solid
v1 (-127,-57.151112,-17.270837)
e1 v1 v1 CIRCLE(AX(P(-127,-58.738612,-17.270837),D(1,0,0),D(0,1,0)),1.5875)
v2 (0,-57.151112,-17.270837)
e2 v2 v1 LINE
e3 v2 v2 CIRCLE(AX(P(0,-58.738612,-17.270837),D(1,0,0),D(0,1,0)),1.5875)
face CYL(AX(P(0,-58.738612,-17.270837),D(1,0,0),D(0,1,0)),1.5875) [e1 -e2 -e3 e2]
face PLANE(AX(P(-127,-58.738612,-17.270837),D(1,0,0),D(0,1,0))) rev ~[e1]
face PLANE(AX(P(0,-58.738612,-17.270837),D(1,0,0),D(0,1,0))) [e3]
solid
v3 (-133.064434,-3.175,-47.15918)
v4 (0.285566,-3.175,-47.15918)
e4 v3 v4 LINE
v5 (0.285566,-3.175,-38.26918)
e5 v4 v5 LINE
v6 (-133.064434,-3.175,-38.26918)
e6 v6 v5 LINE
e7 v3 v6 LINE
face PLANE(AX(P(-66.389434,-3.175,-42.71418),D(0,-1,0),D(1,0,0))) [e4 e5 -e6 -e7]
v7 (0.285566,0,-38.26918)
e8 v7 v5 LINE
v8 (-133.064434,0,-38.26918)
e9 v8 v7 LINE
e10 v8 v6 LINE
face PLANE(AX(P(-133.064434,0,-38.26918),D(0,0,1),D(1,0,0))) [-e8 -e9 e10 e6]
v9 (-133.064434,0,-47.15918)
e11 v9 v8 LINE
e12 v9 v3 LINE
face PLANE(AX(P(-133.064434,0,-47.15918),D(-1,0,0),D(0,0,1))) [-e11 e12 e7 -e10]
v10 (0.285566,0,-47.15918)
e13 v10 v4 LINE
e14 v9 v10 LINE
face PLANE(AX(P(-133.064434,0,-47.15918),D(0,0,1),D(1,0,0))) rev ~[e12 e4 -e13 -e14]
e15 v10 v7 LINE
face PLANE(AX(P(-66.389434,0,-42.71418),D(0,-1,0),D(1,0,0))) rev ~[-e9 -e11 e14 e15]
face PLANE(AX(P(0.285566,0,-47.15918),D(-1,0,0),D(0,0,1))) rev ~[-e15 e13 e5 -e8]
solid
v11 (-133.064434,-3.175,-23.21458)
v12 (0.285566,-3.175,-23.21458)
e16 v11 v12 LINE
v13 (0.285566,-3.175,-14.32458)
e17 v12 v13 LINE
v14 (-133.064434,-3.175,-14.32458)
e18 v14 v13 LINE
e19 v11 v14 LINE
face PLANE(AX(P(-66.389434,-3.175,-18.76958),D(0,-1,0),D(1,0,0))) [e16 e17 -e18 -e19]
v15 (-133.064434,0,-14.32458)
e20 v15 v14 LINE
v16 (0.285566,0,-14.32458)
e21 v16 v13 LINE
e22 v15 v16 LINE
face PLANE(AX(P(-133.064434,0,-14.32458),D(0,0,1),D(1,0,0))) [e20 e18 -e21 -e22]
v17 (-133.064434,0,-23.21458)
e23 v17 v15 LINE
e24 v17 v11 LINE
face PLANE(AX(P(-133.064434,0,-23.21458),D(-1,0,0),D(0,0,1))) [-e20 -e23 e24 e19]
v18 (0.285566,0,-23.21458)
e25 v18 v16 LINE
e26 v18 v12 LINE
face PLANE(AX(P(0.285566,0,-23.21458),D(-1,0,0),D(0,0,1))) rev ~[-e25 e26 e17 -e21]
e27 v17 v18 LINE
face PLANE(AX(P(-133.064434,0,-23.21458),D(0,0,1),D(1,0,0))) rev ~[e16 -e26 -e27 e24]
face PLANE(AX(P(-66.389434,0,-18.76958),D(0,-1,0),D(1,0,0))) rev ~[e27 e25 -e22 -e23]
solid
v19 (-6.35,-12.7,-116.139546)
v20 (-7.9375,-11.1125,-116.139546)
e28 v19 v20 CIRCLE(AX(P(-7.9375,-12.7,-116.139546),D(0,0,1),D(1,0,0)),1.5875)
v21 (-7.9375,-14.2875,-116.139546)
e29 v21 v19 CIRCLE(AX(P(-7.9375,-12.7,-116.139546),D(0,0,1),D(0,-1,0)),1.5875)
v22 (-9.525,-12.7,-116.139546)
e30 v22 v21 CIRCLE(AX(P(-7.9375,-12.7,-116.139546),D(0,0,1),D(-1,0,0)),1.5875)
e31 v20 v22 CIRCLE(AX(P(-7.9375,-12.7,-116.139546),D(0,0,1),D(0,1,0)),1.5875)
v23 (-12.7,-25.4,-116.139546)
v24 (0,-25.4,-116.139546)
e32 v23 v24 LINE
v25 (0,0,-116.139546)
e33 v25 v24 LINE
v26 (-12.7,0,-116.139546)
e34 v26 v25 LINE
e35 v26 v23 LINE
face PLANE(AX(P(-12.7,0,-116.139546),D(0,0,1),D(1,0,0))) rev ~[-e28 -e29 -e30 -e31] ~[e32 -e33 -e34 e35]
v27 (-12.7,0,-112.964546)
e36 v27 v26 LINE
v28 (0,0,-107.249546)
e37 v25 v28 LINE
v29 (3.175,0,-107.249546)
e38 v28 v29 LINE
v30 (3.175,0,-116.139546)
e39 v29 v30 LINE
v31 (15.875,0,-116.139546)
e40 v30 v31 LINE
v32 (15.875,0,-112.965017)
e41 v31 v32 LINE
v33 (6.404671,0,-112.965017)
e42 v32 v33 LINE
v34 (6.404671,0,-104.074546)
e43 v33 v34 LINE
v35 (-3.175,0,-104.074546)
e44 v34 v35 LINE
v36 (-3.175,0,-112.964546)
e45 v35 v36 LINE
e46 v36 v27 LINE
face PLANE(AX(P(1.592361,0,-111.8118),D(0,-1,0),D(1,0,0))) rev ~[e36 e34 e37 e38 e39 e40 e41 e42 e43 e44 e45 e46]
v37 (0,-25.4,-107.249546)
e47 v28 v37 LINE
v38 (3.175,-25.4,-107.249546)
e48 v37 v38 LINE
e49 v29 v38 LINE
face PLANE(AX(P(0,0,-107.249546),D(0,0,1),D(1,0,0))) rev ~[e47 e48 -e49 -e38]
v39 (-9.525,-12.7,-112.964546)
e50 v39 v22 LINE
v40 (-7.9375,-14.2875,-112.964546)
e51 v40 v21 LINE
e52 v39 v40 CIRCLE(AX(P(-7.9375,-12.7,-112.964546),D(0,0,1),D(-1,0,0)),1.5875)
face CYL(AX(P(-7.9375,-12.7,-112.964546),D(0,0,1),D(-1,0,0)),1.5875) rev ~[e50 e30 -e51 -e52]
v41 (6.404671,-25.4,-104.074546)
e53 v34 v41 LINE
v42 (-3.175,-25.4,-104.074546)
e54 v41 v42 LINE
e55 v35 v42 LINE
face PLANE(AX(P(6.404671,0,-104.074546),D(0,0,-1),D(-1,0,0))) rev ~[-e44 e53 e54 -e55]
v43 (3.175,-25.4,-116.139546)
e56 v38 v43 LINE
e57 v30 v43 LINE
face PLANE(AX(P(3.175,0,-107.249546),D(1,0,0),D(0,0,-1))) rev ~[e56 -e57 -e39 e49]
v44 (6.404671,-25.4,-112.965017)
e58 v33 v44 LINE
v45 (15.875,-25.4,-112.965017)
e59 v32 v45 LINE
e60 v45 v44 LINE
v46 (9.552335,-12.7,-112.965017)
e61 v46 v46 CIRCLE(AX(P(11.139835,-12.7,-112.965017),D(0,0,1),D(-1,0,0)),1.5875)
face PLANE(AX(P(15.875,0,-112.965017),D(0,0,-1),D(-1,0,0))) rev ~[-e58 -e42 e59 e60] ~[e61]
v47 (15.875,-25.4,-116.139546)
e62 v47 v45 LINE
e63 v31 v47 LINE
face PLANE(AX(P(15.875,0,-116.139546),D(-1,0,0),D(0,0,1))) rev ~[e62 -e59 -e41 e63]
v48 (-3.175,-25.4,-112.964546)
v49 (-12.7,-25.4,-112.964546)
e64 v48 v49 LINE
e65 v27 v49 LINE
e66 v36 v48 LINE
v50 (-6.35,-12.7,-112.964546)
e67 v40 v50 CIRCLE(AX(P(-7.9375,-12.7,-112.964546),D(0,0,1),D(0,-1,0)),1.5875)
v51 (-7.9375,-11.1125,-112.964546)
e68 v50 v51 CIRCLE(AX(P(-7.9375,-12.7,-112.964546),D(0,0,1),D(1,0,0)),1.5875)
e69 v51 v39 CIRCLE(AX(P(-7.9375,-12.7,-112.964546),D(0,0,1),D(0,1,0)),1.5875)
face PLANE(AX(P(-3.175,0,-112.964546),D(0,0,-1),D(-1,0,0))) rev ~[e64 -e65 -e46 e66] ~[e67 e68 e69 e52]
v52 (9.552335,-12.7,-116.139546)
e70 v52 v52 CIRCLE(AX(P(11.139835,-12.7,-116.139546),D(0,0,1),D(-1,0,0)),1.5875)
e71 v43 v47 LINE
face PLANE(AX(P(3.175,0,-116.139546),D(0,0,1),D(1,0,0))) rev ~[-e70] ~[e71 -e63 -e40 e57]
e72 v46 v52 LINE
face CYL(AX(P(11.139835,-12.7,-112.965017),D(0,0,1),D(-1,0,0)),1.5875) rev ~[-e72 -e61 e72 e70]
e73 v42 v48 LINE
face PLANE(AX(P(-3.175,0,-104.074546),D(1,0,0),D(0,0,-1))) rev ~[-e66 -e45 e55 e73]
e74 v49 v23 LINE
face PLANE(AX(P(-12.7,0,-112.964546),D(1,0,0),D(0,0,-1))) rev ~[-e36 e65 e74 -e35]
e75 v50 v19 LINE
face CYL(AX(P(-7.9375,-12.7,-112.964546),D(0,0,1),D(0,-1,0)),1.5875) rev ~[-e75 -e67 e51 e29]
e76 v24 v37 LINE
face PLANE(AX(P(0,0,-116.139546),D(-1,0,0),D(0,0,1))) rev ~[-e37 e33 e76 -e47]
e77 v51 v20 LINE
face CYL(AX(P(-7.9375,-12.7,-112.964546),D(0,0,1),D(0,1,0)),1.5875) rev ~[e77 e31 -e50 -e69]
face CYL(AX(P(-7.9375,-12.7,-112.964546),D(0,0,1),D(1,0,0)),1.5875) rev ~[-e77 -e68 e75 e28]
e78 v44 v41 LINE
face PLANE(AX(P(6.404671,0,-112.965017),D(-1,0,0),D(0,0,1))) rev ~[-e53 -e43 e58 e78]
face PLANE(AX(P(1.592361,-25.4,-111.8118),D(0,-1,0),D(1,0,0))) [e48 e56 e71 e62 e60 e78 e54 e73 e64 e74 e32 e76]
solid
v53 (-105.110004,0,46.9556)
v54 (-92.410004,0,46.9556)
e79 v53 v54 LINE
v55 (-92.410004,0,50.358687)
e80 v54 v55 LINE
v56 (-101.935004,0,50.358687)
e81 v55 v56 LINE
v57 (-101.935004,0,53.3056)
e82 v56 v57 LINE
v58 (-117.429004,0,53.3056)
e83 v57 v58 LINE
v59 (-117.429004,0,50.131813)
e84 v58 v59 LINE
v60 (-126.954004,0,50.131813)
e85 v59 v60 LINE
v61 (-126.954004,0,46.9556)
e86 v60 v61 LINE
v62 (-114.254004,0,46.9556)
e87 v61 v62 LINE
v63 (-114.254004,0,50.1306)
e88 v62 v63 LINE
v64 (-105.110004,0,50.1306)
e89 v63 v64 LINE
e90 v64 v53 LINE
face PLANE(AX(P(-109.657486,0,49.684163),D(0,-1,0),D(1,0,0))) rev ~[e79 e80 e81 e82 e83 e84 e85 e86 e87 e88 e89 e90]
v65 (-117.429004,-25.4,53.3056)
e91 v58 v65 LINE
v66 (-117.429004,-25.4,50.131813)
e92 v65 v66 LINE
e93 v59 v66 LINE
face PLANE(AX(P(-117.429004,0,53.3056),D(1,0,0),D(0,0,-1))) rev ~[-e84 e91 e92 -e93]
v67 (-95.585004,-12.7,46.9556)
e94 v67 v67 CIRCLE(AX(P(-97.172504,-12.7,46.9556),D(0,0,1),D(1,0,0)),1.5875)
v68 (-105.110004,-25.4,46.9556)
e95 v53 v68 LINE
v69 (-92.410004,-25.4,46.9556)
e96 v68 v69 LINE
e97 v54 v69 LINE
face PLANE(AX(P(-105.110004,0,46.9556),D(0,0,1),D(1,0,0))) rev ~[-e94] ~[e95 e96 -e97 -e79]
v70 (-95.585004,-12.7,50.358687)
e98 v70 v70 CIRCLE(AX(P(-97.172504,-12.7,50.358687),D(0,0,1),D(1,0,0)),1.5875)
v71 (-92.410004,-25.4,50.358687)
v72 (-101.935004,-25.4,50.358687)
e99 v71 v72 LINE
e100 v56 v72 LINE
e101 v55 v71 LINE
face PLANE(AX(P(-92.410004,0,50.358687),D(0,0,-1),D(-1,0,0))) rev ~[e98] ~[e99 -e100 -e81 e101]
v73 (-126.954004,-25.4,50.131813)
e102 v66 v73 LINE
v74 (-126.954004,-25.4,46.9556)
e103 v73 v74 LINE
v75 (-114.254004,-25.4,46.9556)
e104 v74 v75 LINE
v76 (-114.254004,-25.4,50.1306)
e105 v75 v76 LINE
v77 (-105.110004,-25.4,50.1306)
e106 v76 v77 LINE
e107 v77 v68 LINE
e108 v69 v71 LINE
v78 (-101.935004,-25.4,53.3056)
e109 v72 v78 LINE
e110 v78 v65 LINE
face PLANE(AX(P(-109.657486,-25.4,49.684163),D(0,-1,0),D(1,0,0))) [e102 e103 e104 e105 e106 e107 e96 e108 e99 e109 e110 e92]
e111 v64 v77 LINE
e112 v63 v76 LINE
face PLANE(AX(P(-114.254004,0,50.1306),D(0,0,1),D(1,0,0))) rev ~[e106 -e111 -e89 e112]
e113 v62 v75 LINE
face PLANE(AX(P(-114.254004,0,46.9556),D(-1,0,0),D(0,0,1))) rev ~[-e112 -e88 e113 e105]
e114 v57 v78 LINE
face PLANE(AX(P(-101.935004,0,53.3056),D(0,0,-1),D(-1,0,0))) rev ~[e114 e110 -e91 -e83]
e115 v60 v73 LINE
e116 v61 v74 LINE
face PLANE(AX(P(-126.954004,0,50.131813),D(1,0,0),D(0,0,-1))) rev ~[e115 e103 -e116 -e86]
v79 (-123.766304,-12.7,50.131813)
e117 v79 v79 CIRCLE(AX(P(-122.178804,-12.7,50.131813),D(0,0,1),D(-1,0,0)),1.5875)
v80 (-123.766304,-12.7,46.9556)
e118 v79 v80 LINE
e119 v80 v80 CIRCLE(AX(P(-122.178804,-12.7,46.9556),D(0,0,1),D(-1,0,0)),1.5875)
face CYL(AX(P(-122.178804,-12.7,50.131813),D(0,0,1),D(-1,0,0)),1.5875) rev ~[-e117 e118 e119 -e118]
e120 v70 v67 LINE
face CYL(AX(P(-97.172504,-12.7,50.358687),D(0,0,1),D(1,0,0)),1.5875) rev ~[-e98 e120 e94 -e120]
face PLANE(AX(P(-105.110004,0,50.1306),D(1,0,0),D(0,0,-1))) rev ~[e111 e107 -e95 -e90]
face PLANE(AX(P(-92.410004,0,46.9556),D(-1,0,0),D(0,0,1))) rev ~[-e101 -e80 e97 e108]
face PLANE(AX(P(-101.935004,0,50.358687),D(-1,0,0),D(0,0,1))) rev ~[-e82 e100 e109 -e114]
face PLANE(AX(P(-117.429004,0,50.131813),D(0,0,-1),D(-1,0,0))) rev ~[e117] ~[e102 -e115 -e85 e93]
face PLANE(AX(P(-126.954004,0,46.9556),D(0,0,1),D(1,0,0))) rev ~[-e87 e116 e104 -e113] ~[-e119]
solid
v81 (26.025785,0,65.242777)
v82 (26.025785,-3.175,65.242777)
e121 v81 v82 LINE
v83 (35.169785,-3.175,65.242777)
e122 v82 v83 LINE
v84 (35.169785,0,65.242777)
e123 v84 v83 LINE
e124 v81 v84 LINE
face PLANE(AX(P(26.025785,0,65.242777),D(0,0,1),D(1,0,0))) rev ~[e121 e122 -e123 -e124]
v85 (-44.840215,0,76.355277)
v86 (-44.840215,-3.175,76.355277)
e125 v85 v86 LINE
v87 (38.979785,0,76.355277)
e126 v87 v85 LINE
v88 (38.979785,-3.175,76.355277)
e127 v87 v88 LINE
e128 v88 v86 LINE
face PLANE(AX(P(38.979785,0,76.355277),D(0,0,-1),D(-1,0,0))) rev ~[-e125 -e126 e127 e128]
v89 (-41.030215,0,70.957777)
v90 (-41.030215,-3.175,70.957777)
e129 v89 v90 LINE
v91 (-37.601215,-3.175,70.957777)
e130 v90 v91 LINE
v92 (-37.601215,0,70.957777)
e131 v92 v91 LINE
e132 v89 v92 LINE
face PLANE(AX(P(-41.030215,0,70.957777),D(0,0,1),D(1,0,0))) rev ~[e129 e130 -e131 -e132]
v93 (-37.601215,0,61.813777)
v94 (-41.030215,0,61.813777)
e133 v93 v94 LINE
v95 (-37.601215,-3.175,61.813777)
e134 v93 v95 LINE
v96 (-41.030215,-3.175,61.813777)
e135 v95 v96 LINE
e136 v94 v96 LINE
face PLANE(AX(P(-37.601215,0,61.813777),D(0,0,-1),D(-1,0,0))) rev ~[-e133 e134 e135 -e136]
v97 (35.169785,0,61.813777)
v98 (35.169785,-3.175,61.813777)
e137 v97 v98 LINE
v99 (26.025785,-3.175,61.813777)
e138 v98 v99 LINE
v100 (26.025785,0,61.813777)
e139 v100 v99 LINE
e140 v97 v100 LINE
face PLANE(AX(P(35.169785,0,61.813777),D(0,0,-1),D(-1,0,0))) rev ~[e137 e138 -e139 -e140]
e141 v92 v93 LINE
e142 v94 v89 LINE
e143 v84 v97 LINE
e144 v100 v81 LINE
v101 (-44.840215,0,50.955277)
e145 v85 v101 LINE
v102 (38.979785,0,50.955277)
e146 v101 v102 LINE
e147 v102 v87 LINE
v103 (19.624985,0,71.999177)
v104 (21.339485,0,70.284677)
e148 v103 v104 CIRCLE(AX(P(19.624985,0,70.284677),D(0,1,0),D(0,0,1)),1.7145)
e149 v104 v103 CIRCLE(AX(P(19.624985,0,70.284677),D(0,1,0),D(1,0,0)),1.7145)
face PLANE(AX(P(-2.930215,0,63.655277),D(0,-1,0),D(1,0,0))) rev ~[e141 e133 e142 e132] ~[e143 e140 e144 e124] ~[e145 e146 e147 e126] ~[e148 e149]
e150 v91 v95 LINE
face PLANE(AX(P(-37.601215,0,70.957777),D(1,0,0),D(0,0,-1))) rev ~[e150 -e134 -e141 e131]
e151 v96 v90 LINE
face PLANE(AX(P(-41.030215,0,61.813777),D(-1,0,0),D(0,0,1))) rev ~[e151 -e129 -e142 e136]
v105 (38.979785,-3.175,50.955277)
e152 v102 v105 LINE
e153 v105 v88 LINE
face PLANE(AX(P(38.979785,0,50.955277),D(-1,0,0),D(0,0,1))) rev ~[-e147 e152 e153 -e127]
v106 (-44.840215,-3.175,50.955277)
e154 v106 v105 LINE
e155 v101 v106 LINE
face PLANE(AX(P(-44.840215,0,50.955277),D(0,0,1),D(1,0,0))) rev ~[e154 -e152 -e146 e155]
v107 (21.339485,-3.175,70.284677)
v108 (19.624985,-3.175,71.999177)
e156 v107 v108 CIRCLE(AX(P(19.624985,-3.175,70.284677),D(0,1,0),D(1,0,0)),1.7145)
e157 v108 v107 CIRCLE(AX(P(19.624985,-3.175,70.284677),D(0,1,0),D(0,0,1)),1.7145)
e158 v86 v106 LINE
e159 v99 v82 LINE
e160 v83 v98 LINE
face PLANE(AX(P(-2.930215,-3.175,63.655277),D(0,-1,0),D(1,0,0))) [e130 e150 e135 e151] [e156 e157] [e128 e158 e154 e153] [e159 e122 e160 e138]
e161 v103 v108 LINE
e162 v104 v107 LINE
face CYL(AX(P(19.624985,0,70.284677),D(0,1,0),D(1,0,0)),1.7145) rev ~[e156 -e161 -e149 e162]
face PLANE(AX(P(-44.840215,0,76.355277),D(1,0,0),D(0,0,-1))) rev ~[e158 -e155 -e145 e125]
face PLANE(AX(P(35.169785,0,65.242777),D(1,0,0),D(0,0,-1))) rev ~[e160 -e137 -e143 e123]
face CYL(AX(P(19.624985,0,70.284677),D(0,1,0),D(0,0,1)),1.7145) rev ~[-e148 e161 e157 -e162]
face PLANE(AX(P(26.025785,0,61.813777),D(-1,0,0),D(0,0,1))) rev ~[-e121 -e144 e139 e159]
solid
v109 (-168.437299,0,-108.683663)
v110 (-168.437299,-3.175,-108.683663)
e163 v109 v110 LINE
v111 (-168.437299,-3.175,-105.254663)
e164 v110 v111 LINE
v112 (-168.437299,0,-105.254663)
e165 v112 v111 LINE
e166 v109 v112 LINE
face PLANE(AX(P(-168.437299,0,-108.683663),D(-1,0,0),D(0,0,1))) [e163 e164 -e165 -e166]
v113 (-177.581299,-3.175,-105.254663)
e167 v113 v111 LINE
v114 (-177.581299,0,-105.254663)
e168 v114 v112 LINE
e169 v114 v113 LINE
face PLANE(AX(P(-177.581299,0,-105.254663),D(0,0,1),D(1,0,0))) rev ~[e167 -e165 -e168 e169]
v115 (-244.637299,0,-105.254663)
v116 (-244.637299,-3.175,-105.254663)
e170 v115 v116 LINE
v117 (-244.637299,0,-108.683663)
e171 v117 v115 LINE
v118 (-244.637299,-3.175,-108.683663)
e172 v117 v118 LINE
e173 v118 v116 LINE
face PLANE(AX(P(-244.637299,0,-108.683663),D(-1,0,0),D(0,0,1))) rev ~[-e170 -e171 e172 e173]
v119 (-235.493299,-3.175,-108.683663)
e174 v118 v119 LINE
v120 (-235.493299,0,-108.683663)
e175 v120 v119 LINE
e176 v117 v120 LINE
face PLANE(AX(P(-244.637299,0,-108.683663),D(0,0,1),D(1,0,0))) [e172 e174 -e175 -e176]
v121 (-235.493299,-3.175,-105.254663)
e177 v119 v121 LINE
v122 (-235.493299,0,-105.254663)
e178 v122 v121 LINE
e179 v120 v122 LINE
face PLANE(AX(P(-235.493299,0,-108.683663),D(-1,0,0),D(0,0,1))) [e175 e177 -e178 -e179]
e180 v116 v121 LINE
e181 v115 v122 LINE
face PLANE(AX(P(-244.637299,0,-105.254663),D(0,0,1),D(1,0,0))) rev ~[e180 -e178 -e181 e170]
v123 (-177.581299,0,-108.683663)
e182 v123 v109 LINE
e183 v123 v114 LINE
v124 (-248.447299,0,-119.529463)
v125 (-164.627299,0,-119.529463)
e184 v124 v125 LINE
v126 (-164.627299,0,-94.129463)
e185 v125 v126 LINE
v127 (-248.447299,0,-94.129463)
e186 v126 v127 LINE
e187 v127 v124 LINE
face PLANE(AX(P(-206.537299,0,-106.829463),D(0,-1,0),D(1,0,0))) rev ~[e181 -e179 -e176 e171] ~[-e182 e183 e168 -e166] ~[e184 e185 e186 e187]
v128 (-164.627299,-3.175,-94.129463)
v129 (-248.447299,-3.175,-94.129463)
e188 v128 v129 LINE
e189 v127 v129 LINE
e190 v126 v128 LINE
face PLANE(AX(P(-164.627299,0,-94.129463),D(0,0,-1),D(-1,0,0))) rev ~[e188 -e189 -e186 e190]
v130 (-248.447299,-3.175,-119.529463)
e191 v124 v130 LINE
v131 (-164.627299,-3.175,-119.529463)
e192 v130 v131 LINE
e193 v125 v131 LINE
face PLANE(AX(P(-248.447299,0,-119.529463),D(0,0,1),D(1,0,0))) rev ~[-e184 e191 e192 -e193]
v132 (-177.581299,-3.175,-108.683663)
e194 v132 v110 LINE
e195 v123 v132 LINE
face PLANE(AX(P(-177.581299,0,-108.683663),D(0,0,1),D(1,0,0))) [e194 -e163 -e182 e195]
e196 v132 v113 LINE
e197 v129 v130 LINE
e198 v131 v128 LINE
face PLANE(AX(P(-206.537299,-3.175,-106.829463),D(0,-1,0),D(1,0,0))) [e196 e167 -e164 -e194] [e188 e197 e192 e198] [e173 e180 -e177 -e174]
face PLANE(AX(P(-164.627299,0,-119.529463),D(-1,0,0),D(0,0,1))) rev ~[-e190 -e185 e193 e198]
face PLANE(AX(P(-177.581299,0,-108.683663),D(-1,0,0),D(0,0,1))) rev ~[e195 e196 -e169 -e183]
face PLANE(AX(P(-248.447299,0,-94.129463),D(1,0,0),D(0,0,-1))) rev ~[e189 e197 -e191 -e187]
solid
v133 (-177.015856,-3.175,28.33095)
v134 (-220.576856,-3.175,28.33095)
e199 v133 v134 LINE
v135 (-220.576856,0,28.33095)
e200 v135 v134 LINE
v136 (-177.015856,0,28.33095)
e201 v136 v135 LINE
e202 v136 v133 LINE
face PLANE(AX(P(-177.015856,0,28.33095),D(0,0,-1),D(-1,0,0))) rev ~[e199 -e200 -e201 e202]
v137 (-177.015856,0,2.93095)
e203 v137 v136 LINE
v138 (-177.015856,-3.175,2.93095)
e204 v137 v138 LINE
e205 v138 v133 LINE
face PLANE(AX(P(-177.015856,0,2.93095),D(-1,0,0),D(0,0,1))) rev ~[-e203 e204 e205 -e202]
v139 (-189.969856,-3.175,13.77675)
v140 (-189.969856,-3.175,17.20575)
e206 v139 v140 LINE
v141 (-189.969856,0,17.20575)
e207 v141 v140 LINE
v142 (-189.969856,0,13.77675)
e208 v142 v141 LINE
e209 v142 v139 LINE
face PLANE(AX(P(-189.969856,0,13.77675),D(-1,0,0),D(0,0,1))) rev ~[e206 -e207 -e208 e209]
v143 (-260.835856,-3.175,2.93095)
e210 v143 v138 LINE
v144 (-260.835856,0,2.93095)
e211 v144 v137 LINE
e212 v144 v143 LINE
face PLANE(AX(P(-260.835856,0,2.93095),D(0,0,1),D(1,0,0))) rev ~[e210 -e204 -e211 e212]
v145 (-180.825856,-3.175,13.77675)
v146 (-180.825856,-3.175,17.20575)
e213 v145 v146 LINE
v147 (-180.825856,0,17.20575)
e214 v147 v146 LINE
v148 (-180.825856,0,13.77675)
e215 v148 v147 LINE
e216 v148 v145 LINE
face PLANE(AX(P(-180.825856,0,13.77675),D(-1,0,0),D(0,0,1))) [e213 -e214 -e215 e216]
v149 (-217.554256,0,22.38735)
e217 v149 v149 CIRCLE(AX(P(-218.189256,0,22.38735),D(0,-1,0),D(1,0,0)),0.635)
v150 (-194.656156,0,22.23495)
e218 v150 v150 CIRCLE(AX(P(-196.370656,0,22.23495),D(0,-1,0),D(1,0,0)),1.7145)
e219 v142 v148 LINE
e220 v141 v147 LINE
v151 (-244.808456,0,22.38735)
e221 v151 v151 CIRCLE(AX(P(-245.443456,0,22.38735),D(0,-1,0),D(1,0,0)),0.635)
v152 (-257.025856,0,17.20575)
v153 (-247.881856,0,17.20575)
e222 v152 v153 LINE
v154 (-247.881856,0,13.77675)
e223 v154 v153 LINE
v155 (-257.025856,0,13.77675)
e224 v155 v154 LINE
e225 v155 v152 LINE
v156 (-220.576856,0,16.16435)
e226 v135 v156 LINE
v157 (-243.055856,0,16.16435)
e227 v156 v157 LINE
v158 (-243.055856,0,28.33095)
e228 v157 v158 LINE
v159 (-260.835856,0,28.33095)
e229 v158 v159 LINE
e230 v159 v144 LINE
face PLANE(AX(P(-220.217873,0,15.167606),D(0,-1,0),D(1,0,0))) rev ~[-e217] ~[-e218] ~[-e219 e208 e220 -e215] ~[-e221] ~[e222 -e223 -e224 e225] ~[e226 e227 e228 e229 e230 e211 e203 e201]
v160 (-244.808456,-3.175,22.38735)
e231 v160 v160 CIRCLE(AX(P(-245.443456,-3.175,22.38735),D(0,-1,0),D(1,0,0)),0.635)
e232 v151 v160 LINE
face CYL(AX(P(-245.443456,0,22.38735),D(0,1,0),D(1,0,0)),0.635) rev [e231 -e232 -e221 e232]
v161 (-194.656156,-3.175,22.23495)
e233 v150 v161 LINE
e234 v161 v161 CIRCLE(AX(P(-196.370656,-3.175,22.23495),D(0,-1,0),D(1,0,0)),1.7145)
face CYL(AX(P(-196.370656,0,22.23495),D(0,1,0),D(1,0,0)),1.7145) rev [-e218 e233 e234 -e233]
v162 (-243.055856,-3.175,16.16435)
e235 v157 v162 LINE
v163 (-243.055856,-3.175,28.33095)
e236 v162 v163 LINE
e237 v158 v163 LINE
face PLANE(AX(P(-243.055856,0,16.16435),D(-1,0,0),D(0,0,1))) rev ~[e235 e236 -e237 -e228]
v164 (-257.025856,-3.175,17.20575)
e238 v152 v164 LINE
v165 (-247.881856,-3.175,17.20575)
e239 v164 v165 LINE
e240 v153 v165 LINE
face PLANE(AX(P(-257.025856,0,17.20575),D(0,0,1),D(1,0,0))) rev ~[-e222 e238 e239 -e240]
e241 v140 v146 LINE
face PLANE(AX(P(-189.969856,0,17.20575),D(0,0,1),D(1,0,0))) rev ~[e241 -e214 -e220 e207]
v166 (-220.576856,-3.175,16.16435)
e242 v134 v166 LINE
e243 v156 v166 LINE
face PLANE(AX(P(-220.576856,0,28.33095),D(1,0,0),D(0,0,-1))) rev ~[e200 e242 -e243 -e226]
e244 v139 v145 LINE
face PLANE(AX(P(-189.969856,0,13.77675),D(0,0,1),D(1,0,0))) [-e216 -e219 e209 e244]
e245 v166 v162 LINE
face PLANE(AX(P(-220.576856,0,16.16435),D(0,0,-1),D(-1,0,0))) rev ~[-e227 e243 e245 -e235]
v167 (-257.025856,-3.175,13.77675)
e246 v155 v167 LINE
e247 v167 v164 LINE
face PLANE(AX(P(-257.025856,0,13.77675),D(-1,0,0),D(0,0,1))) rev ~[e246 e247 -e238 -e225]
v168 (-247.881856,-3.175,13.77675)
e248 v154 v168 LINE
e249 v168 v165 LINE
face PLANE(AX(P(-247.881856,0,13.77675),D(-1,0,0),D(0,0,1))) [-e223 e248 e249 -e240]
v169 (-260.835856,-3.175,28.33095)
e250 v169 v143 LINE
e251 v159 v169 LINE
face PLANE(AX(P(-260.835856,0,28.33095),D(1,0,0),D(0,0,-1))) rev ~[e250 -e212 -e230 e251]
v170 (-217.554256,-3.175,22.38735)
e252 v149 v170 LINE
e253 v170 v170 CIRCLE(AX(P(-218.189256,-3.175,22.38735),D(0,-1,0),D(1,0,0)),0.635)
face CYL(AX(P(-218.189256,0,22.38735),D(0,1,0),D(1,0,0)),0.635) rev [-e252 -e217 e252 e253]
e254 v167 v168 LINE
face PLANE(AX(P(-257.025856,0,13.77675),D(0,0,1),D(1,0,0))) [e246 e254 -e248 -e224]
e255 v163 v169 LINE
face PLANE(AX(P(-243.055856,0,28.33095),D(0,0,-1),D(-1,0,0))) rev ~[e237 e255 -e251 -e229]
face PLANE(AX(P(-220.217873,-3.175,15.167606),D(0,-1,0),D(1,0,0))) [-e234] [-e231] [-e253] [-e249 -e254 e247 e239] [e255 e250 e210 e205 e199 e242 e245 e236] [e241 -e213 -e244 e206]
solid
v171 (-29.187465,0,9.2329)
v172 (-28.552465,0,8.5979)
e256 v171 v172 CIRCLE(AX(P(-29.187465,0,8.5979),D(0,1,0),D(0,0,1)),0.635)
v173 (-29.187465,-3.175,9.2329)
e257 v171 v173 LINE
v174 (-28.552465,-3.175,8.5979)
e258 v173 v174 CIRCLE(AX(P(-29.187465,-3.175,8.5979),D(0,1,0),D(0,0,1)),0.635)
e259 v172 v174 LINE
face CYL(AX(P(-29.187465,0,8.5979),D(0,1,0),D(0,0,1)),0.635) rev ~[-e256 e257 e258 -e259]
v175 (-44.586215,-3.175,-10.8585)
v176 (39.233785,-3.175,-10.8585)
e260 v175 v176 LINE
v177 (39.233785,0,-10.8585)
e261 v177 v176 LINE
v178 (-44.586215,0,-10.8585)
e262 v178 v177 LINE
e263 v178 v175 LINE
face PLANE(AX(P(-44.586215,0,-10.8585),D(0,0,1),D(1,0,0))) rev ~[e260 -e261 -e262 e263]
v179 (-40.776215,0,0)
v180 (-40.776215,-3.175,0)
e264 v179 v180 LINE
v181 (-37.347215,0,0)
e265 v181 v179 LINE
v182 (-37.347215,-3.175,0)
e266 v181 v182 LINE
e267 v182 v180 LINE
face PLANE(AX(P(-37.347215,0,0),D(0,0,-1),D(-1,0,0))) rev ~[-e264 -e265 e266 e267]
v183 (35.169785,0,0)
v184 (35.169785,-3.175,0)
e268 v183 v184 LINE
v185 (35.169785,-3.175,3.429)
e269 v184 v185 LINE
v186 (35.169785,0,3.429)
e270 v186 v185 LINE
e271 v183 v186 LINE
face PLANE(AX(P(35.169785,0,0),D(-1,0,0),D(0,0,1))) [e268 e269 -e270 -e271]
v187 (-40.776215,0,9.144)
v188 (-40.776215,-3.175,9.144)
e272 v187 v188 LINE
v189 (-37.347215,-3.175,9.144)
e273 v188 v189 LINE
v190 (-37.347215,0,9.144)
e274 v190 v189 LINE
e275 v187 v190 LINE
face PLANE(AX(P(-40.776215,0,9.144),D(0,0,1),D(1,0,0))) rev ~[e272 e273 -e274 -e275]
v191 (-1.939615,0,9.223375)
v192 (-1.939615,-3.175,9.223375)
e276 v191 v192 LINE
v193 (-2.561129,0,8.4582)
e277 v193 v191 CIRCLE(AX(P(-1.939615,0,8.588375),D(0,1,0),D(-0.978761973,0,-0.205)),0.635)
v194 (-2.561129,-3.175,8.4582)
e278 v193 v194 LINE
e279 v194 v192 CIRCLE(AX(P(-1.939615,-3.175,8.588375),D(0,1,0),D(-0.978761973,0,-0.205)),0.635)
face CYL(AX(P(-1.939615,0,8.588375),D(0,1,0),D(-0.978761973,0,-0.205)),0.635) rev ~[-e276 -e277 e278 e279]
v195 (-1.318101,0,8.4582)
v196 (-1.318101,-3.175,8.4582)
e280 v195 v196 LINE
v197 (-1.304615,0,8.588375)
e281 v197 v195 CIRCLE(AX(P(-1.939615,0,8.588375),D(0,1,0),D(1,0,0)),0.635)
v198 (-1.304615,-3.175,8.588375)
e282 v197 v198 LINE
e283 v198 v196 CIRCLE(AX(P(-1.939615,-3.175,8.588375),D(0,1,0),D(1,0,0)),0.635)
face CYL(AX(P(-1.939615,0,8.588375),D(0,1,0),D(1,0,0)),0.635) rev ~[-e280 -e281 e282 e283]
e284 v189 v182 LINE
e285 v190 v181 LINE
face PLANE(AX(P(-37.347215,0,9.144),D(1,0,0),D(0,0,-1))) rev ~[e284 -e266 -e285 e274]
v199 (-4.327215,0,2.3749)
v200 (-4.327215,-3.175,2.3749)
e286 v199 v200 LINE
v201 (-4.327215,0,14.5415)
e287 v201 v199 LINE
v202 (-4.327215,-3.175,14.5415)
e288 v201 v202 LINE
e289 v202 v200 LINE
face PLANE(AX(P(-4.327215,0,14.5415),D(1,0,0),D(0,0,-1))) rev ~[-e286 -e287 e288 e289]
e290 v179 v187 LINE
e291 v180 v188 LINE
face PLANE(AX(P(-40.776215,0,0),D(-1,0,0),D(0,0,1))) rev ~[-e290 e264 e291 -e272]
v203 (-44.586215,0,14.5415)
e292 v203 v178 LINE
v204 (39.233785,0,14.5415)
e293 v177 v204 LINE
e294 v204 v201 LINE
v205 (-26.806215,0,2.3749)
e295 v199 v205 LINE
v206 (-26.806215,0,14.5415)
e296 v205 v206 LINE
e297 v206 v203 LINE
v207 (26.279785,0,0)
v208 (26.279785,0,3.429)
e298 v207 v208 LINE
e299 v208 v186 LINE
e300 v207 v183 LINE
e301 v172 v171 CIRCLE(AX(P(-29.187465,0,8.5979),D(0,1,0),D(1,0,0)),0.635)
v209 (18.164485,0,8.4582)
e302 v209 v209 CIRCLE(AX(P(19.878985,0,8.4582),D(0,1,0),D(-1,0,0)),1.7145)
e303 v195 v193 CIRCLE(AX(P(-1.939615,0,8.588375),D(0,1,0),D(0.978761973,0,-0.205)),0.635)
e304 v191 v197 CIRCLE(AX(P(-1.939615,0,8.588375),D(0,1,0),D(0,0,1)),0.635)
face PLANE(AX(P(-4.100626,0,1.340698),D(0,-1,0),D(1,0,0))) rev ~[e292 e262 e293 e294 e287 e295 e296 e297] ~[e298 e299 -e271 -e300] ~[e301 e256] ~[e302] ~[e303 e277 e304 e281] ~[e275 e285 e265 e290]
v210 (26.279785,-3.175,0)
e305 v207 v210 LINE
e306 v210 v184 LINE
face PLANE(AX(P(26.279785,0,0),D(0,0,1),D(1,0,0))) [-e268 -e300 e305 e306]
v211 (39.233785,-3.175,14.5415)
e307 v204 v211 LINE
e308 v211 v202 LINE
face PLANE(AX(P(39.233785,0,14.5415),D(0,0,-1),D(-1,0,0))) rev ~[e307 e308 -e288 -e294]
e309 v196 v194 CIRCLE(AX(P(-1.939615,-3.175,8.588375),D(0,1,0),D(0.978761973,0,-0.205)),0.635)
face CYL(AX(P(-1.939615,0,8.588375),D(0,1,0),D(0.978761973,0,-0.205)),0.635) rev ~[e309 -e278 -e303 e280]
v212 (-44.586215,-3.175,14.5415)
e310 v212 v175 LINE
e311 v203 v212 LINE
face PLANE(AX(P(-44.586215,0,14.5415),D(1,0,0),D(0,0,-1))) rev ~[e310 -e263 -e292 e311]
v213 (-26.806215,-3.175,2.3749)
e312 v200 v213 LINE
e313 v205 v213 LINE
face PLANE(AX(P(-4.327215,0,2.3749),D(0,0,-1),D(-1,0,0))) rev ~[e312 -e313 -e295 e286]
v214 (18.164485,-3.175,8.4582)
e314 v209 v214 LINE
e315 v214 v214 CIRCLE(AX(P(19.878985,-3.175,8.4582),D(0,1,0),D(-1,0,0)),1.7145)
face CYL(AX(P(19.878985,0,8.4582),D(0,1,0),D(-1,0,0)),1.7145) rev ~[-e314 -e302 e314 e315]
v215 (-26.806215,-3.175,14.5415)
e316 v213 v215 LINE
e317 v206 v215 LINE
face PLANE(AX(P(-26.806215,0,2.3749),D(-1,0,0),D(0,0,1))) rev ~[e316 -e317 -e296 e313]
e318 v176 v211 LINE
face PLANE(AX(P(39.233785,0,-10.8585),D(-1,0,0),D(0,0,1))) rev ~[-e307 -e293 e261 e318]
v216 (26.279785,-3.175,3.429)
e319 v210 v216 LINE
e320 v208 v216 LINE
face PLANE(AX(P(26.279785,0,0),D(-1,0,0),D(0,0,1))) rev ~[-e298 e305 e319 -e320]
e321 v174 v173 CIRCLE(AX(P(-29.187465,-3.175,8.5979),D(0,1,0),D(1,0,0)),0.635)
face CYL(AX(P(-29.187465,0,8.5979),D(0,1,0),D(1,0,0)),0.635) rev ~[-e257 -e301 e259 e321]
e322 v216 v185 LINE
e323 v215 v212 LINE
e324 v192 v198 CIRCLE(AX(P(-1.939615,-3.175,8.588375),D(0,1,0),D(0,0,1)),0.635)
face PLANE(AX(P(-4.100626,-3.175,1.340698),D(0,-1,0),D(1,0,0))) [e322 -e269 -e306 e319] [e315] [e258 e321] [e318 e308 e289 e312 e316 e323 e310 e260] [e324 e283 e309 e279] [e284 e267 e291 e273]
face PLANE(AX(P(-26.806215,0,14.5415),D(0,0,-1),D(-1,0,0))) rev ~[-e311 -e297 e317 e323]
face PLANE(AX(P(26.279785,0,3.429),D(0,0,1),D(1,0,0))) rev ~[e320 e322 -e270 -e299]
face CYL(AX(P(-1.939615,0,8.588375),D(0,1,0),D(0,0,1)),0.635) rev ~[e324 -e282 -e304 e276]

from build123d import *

# Parameters (mm, degrees)
F0_W      = 133.35
F0_H      = 8.89
F1_DEPTH  = 3.175
F2_DEPTH  = 3.175
F0_W_2    = 5.715
F0_H_2    = 3.429
F0_W_3    = 3.429
F0_H_3    = 5.715
F3_DEPTH  = 3.175
F0_W_4    = 8.89
F0_W_5    = 5.461
F4_DEPTH  = 3.175
F5_DEPTH  = 25.4
F6_R      = 1.5875
F8_DEPTH  = 97.2919927368
F0_W_6    = 9.144
F0_R      = 0.635
F0_R_2    = 1.7145
F9_DEPTH  = 3.175
F10_DEPTH = 3.175
F11_R     = 1.5875
F12_DEPTH = 127
F13_DEPTH = 25.4
F16_DEPTH = 6.5659173141


# Not quite as in the source:
# - a feature names something its author has since deleted; it is built from what else it names


with BuildPart() as f1:
    # F0 (on Front) → F1 (new body)
    with BuildSketch(Plane.XZ):
        with Locations((-66.3894339323, -18.7695804912)):
            Rectangle(F0_W, F0_H)
    extrude(amount=F1_DEPTH)


with BuildPart() as f2:
    # F0 (on Front) → F2 (new body)
    with BuildSketch(Plane.XZ):
        with Locations((-66.3894339323, -42.7141800451)):
            Rectangle(F0_W, F0_H)
    extrude(amount=F2_DEPTH)


with BuildPart() as f3:
    # F0 (on Front) → F3 (new body)
    with BuildSketch(Plane.XZ):
        Polygon((-41.0302151682, 76.3552769363), (-44.8402151682, 76.3552769363), (-44.8402151682, 50.9552769363), (38.9797848318, 50.9552769363), (38.9797848318, 76.3552769363), (35.1697848318, 76.3552769363), (19.6249848318, 76.3552769363), (9.5919848318, 76.3552769363), align=None)
        Polygon((-41.0302151682, 65.2427769363), (-41.0302151682, 70.9577769363), (-37.6012151682, 70.9577769363), (-37.6012151682, 65.2427769363), (-31.8862151682, 65.2427769363), (-31.8862151682, 61.8137769363), (-37.6012151682, 61.8137769363), (-41.0302151682, 61.8137769363), align=None, mode=Mode.SUBTRACT)
        with BuildLine():
            ThreePointArc((21.3394848318, 70.2846769363), (18.4126502554, 69.0723423599), (19.6249848318, 71.9991769363))
            ThreePointArc((19.6249848318, 71.9991769363), (20.8373194081, 71.4970115126), (21.3394848318, 70.2846769363))
        make_face(mode=Mode.SUBTRACT)
        Polygon((31.7407848318, 70.9577769363), (35.1697848318, 70.9577769363), (35.1697848318, 65.2427769363), (35.1697848318, 61.8137769363), (31.7407848318, 61.8137769363), (26.0257848318, 61.8137769363), (26.0257848318, 65.2427769363), (31.7407848318, 65.2427769363), align=None, mode=Mode.SUBTRACT)
        with Locations((-34.7437151682, 63.5282769363)):
            Rectangle(F0_W_2, F0_H_2)
        with Locations((33.4552848318, 68.1002769363)):
            Rectangle(F0_W_3, F0_H_3)
    extrude(amount=F3_DEPTH)


with BuildPart() as f4:
    # F0 (on Front) → F4 (new body)
    with BuildSketch(Plane.XZ):
        with BuildLine():
            Line((-40.7762151682, 14.5415), (-44.5862151682, 14.5415))
            Line((-44.5862151682, 14.5415), (-44.5862151682, -10.8585))
            Line((-44.5862151682, -10.8585), (-28.4685809165, -10.8585))
            Line((-28.4685809165, -10.8585), (-5.4275859147, -10.8585))
            Line((-5.4275859147, -10.8585), (35.4237848318, -10.8585))
            Line((35.4237848318, -10.8585), (39.2337848318, -10.8585))
            Line((39.2337848318, -10.8585), (39.2337848318, 14.5415))
            Line((39.2337848318, 14.5415), (9.8332848318, 14.5415))
            Line((9.8332848318, 14.5415), (-1.9396151682, 14.5415))
            Line((-1.9396151682, 14.5415), (-1.9396151682, 9.223375))
            ThreePointArc((-1.9396151682, 9.223375), (-1.4906023622, 9.0373878061), (-1.3046151682, 8.588375))
            ThreePointArc((-1.3046151682, 8.588375), (-1.3079957034, 8.5229391406), (-1.3181013153, 8.4582))
            ThreePointArc((-1.3181013153, 8.4582), (-1.9396151682, 7.953375), (-2.5611290212, 8.4582))
            Line((-2.5611290212, 8.4582), (-4.3272151682, 8.4582))
            Line((-4.3272151682, 8.4582), (-4.3272151682, 2.3749))
            Line((-4.3272151682, 2.3749), (-26.8062151682, 2.3749))
            Line((-26.8062151682, 2.3749), (-26.8062151682, 8.5979))
            Line((-26.8062151682, 8.5979), (-28.5524651682, 8.5979))
            ThreePointArc((-28.5524651682, 8.5979), (-29.6364779743, 8.1488871939), (-29.1874651682, 9.2329))
            Line((-29.1874651682, 9.2329), (-29.1874651682, 14.5415))
            Line((-29.1874651682, 14.5415), (-40.7762151682, 14.5415))
        make_face()
        Polygon((-40.7762151682, 3.429), (-40.7762151682, 9.144), (-37.3472151682, 9.144), (-37.3472151682, 3.429), (-31.8862151682, 3.429), (-31.8862151682, 0), (-37.3472151682, 0), (-40.7762151682, 0), align=None, mode=Mode.SUBTRACT)
        with Locations((30.7247848318, 1.7145)):
            Rectangle(F0_W_4, F0_H_2, mode=Mode.SUBTRACT)
        with BuildLine():
            ThreePointArc((21.5934848318, 8.4582), (19.8789848318, 6.7437), (18.1644848318, 8.4582))
            ThreePointArc((18.1644848318, 8.4582), (19.8789848318, 10.1727), (21.5934848318, 8.4582))
        make_face(mode=Mode.SUBTRACT)
        with BuildLine():
            Line((-26.8062151682, 14.5415), (-29.1874651682, 14.5415))
            Line((-29.1874651682, 14.5415), (-29.1874651682, 9.2329))
            ThreePointArc((-29.1874651682, 9.2329), (-28.7384523622, 9.0469128061), (-28.5524651682, 8.5979))
            Line((-28.5524651682, 8.5979), (-26.8062151682, 8.5979))
            Line((-26.8062151682, 8.5979), (-26.8062151682, 14.5415))
        make_face()
        with BuildLine():
            Line((-1.9396151682, 14.5415), (-4.3272151682, 14.5415))
            Line((-4.3272151682, 14.5415), (-4.3272151682, 8.588375))
            Line((-4.3272151682, 8.588375), (-4.3272151682, 8.4582))
            Line((-4.3272151682, 8.4582), (-2.5611290212, 8.4582))
            ThreePointArc((-2.5611290212, 8.4582), (-2.4325077148, 8.9887272668), (-1.9396151682, 9.223375))
            Line((-1.9396151682, 9.223375), (-1.9396151682, 14.5415))
        make_face()
        with Locations((-34.6167151682, 1.7145)):
            Rectangle(F0_W_5, F0_H_2)
    extrude(amount=F4_DEPTH)


with BuildPart() as f5:
    # F0 (on Front) → F5 (new body)
    with BuildSketch(Plane.XZ):
        Polygon((-101.9350041685, 53.3056003809), (-117.4290041685, 53.3056003809), (-117.4290041685, 50.1318126917), (-126.9540041685, 50.1318126917), (-126.9540041685, 46.9556003809), (-114.2540041685, 46.9556003809), (-114.2540041685, 50.1306003809), (-105.1100041685, 50.1306003809), (-105.1100041685, 46.9556003809), (-92.4100041685, 46.9556003809), (-92.4100041685, 50.3586865962), (-101.9350041685, 50.3586865962), align=None)
    extrude(amount=F5_DEPTH)

    # F7 (on face) + F6 (on face) → F8 (cut, through all)
    with BuildSketch(Plane.XY.offset(50.1318126917)):
        with BuildLine():
            ThreePointArc((-120.5913041685, -12.7), (-122.1788041685, -11.1125), (-123.7663041685, -12.7))
            ThreePointArc((-123.7663041685, -12.7), (-122.1788041685, -14.2875), (-120.5913041685, -12.7))
        make_face()
    with BuildSketch(Plane.XY.offset(50.3586865962)):
        with Locations((-97.1725041685, -12.7)):
            Circle(F6_R)
    extrude(amount=-F8_DEPTH, mode=Mode.SUBTRACT)


with BuildPart() as f9:
    # F0 (on Front) → F9 (new body)
    with BuildSketch(Plane.XZ):
        Polygon((-257.0258561993, 28.3309499077), (-260.8358561993, 28.3309499077), (-260.8358561993, 22.2349499077), (-260.8358561993, 2.9309499077), (-177.0158561993, 2.9309499077), (-177.0158561993, 28.3309499077), (-180.8258561993, 28.3309499077), (-206.4036561993, 28.3309499077), (-220.5768561993, 28.3309499077), (-220.5768561993, 16.1643499077), (-243.0558561993, 16.1643499077), (-243.0558561993, 28.3309499077), align=None)
        with Locations((-252.4538561993, 15.4912499077)):
            Rectangle(F0_W_6, F0_H_2, mode=Mode.SUBTRACT)
        with Locations((-245.4434561993, 22.3873499077)):
            Circle(F0_R, mode=Mode.SUBTRACT)
        with Locations((-218.1892561993, 22.3873499077)):
            Circle(F0_R, mode=Mode.SUBTRACT)
        with Locations((-196.3706561993, 22.2349499077)):
            Circle(F0_R_2, mode=Mode.SUBTRACT)
        with Locations((-185.3978561993, 15.4912499077)):
            Rectangle(F0_W_6, F0_H_2, mode=Mode.SUBTRACT)
    extrude(amount=F9_DEPTH)


with BuildPart() as f10:
    # F0 (on Front) → F10 (new body)
    with BuildSketch(Plane.XZ):
        Polygon((-244.6372990036, -94.1294633508), (-248.4472990036, -94.1294633508), (-248.4472990036, -119.5294633508), (-164.6272990036, -119.5294633508), (-164.6272990036, -94.1294633508), (-168.4372990036, -94.1294633508), align=None)
        with Locations((-240.0652990036, -106.9691633508)):
            Rectangle(F0_W_6, F0_H_2, mode=Mode.SUBTRACT)
        with Locations((-173.0092990036, -106.9691633508)):
            Rectangle(F0_W_6, F0_H_2, mode=Mode.SUBTRACT)
    extrude(amount=F10_DEPTH)


with BuildPart() as f12:
    # F11 (on Right) → F12 (new body)
    with BuildSketch(Plane.YZ):
        with Locations((-58.7386116385, -17.2708369792)):
            Circle(F11_R)
    extrude(amount=-F12_DEPTH)


with BuildPart() as f13:
    # F0 (on Front) → F13 (new body)
    with BuildSketch(Plane.XZ):
        Polygon((6.4046707157, -104.0745460367), (-3.175, -104.0745460367), (-3.175, -112.9645460367), (-12.7, -112.9645460367), (-12.7, -116.1395460367), (0, -116.1395460367), (0, -107.2495460367), (3.175, -107.2495460367), (3.175, -116.1395460367), (15.875, -116.1395460367), (15.875, -112.9650167625), (6.4046707157, -112.9650167625), align=None)
    extrude(amount=F13_DEPTH)

    # F14 (on face) + F15 (on face) → F16 (cut, through all)
    with BuildSketch(Plane.XY.offset(-112.9645460367)):
        with BuildLine():
            Line((-7.9375, -11.1125), (-7.9375, -12.7))
            Line((-7.9375, -12.7), (-7.9375, -14.2875))
            ThreePointArc((-7.9375, -14.2875), (-6.8149679849, -13.8225320151), (-6.35, -12.7))
            ThreePointArc((-6.35, -12.7), (-6.8149679849, -11.5774679849), (-7.9375, -11.1125))
        make_face()
        with BuildLine():
            Line((-7.9375, -12.7), (-9.525, -12.7))
            ThreePointArc((-9.525, -12.7), (-9.0600320151, -13.8225320151), (-7.9375, -14.2875))
            Line((-7.9375, -14.2875), (-7.9375, -12.7))
        make_face()
        with BuildLine():
            ThreePointArc((-7.9375, -11.1125), (-9.0600320151, -11.5774679849), (-9.525, -12.7))
            Line((-9.525, -12.7), (-7.9375, -12.7))
            Line((-7.9375, -12.7), (-7.9375, -11.1125))
        make_face()
    with BuildSketch(Plane.XY.offset(-112.9650167625)):
        with BuildLine():
            ThreePointArc((12.7273353579, -12.7), (11.1398353579, -11.1125), (9.5523353579, -12.7))
            ThreePointArc((9.5523353579, -12.7), (11.1398353579, -14.2875), (12.7273353579, -12.7))
        make_face()
    extrude(amount=-F16_DEPTH, mode=Mode.SUBTRACT)


solid = Compound([f1.part, f2.part, f3.part, f4.part, f5.part, f9.part, f10.part, f12.part, f13.part])
